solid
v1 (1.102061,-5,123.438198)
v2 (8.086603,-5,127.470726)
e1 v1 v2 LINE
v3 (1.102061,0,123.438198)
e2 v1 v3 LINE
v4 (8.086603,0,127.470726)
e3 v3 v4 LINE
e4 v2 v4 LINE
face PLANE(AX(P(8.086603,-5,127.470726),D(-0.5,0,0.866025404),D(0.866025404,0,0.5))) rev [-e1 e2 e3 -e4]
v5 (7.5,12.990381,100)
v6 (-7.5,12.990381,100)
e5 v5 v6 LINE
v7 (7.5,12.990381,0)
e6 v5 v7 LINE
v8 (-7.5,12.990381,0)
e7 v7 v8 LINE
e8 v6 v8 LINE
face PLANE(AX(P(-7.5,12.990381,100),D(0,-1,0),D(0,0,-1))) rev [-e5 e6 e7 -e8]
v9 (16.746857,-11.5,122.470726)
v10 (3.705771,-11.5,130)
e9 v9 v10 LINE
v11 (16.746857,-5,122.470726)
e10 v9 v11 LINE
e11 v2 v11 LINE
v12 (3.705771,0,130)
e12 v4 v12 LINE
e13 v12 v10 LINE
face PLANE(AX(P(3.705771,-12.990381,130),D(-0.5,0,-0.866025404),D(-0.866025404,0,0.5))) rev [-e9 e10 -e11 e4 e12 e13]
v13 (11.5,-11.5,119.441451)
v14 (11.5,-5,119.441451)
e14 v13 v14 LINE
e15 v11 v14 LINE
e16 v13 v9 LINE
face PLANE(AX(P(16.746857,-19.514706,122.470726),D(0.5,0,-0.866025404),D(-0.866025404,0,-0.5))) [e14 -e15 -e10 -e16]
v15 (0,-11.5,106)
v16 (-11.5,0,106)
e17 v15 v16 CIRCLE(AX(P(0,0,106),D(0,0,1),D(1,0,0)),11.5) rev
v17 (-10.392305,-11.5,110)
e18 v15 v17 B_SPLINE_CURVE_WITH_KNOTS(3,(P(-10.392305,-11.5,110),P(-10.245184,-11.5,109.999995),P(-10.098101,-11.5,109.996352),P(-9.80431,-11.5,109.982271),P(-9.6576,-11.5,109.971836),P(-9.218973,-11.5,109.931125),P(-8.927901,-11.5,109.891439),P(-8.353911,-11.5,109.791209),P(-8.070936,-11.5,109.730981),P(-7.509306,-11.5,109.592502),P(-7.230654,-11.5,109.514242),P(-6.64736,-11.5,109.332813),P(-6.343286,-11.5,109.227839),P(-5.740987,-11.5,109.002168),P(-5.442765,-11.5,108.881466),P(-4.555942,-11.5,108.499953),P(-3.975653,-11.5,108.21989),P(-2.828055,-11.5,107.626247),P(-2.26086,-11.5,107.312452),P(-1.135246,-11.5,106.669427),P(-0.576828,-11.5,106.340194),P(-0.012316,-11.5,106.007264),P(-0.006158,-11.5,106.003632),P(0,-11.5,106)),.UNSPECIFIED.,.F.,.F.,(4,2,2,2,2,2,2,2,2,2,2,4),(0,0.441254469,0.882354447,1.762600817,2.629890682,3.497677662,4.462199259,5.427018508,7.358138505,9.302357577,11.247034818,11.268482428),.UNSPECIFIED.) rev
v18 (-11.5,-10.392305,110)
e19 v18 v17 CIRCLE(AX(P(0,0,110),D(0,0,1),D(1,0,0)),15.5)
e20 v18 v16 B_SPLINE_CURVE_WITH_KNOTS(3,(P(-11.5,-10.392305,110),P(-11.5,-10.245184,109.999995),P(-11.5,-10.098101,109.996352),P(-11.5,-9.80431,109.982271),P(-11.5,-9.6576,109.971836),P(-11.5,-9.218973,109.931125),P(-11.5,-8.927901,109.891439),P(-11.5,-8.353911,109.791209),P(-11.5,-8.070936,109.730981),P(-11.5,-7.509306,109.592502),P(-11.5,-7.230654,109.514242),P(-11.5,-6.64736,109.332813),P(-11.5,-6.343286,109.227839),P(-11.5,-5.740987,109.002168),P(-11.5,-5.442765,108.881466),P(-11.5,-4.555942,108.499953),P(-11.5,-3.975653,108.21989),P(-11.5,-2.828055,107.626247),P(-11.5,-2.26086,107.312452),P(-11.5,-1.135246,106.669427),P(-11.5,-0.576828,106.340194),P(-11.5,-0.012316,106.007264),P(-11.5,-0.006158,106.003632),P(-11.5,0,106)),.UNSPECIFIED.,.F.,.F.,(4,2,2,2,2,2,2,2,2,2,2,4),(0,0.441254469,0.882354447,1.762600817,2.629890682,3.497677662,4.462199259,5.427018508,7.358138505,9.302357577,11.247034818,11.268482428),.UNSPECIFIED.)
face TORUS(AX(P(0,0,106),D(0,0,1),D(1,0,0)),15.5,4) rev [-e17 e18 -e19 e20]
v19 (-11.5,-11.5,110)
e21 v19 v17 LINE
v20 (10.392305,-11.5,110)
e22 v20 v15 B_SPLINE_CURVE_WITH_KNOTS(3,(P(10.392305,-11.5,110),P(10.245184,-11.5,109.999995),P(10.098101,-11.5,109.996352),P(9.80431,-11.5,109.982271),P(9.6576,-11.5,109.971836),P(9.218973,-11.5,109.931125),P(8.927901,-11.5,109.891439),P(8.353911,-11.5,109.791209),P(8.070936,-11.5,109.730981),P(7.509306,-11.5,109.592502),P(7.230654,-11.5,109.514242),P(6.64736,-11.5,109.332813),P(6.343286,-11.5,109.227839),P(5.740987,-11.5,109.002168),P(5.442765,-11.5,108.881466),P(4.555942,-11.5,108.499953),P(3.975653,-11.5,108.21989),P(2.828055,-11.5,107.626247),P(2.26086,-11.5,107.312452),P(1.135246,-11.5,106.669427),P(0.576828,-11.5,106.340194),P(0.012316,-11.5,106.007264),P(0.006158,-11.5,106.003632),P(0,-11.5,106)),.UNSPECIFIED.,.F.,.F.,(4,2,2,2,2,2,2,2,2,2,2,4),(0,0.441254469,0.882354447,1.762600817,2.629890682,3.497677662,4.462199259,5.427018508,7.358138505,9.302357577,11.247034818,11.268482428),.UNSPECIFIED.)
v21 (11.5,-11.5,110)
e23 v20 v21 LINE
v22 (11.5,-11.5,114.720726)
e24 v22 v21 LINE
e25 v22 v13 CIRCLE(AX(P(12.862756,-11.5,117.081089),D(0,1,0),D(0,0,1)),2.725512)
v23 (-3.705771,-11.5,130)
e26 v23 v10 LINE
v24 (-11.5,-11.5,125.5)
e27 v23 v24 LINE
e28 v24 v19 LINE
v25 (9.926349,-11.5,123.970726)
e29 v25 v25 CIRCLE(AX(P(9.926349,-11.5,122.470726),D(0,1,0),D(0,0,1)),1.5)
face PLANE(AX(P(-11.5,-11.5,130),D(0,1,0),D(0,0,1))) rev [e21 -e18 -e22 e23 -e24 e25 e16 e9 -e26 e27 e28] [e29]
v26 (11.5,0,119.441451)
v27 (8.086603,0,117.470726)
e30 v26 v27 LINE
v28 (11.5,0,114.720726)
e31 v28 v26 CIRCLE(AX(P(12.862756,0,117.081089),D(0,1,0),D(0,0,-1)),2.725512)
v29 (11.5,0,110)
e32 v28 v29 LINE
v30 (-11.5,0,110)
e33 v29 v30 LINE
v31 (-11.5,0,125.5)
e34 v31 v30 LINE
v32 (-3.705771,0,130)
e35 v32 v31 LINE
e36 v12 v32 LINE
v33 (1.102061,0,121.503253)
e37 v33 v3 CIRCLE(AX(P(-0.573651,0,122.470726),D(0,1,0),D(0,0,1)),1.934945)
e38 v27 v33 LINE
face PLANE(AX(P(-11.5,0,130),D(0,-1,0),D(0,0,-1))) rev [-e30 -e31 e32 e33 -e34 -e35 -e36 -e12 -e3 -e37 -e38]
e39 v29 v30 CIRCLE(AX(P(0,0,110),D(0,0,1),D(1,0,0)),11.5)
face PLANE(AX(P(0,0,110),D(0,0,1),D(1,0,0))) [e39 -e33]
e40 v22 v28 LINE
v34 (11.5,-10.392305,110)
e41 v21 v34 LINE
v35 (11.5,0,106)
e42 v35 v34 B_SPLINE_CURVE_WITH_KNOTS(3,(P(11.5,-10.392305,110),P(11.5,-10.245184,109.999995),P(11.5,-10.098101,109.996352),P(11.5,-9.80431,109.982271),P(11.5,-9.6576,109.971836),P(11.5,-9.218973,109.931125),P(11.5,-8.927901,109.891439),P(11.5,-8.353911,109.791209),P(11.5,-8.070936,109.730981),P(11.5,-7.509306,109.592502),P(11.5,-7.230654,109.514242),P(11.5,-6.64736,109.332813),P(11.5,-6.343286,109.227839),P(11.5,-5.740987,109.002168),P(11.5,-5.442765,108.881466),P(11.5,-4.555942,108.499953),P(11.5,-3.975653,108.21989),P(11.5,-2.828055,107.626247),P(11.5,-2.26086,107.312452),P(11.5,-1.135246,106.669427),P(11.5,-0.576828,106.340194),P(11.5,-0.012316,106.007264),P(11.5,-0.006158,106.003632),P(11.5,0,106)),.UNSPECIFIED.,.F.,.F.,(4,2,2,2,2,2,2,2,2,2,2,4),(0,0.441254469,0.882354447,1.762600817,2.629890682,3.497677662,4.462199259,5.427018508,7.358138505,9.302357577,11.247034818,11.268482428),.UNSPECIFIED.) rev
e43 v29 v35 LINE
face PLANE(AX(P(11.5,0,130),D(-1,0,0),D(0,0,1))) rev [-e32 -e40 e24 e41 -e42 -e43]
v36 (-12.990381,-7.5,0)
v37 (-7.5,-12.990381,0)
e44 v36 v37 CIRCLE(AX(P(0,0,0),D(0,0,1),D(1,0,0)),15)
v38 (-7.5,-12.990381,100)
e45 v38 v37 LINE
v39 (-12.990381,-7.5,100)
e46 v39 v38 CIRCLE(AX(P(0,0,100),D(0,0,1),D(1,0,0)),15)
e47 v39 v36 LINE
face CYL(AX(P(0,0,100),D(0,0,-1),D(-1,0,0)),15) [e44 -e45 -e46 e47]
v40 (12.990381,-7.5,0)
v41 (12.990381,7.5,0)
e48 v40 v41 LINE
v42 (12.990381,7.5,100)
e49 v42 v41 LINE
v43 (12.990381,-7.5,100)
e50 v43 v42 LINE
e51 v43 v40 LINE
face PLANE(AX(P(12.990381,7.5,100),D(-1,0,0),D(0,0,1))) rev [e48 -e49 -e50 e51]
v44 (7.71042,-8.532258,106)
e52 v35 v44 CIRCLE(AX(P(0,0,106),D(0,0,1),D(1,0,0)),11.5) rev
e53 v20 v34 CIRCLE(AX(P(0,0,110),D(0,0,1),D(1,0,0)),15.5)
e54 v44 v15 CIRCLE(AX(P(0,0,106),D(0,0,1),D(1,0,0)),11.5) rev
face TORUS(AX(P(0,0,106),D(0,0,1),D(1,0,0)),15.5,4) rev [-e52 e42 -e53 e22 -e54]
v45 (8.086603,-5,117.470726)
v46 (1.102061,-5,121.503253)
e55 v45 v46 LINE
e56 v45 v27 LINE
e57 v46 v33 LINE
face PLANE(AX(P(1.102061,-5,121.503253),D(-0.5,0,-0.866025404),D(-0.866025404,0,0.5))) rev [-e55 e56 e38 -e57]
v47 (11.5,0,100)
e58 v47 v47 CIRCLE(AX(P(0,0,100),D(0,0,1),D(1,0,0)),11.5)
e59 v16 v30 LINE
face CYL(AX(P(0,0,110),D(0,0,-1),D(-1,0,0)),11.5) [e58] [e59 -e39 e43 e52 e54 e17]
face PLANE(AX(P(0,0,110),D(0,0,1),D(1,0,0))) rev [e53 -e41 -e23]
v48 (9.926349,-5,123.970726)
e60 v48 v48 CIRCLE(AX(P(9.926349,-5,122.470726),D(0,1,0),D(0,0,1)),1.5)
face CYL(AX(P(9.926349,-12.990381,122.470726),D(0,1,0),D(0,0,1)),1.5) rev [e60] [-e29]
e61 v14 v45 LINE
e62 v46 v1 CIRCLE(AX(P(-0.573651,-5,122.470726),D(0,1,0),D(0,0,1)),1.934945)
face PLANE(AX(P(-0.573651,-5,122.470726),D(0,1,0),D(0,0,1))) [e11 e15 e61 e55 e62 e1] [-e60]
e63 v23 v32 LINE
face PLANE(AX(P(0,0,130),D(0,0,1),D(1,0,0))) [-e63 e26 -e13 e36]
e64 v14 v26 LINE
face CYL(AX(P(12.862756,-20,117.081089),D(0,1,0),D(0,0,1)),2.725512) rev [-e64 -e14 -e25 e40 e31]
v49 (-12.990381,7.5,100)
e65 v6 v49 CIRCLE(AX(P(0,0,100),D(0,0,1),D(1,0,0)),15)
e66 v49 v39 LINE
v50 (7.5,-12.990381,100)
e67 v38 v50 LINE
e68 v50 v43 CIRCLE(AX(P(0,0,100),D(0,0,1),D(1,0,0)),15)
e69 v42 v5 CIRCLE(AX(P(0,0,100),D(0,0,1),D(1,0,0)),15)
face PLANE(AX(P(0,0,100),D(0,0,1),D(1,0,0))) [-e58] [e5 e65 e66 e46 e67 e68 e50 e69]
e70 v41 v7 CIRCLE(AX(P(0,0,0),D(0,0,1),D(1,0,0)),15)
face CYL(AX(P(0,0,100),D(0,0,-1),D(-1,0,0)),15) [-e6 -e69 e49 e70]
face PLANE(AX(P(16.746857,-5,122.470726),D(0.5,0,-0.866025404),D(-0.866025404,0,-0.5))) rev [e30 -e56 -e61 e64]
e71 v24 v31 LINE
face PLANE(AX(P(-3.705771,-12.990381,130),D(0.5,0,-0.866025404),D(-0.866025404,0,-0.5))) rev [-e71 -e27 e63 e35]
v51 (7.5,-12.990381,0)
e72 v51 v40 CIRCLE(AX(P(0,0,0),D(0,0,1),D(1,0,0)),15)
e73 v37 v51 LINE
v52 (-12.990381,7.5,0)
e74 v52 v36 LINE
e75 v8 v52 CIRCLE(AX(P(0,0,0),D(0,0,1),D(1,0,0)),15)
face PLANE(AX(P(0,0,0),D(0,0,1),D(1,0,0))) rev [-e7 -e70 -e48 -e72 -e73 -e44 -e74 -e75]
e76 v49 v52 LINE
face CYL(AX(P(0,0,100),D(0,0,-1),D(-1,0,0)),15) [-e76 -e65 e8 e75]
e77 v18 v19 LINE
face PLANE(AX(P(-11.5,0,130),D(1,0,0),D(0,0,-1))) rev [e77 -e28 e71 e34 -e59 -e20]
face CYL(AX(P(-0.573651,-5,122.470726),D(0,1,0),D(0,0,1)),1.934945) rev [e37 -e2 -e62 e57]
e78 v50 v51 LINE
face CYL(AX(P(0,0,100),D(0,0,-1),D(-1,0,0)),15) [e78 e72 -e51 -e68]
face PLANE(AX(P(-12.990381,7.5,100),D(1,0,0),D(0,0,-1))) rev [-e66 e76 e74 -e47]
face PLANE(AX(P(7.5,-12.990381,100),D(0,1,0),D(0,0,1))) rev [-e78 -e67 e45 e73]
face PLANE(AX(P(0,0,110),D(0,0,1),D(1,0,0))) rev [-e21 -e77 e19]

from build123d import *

# Parameters (mm, degrees)
EXTRUDE_1_DEPTH     = 100
SKETCH_2_R          = 11.5
EXTRUDE_2_DEPTH     = 10
SKETCH_3_W          = 23
SKETCH_3_H          = 11.5
EXTRUDE_3_DEPTH     = 20
FILLET_3_R          = 4
FILLET_4_R          = 4
CUT_EXTRUDE_1_DEPTH = 132.291660154
EXTRUDE_4_DEPTH     = 11.5
CUT_EXTRUDE_2_DEPTH = 20
CUT_EXTRUDE_3_DEPTH = 5
SKETCH_8_R          = 1.5
CUT_EXTRUDE_4_DEPTH = 133.303102986


with BuildPart() as part:
    # 草图1 → 凸台-拉伸1 (new body)
    with BuildSketch(Plane.XY):
        with BuildLine():
            Line((-7.5, 12.990381057), (7.5, 12.990381057))
            ThreePointArc((7.5, 12.990381057), (10.606601718, 10.606601718), (12.990381057, 7.5))
            Line((12.990381057, 7.5), (12.990381057, -7.5))
            ThreePointArc((12.990381057, -7.5), (10.606601718, -10.606601718), (7.5, -12.990381057))
            Line((7.5, -12.990381057), (-7.5, -12.990381057))
            ThreePointArc((-7.5, -12.990381057), (-10.606601718, -10.606601718), (-12.990381057, -7.5))
            Line((-12.990381057, -7.5), (-12.990381057, 7.5))
            ThreePointArc((-12.990381057, 7.5), (-10.606601718, 10.606601718), (-7.5, 12.990381057))
        make_face()
    extrude(amount=EXTRUDE_1_DEPTH)

    # 草图2 → 凸台-拉伸2 (add)
    with BuildSketch(Plane.XY.offset(100)):
        Circle(SKETCH_2_R)
    extrude(amount=EXTRUDE_2_DEPTH)

    # 草图3 → 凸台-拉伸3 (add)
    with BuildSketch(Plane.XY.offset(110)):
        with Locations((0, -5.75)):
            Rectangle(SKETCH_3_W, SKETCH_3_H)
    extrude(amount=EXTRUDE_3_DEPTH)

    # 圆角3
    # the kernel refuses this fillet: 4 mm, written as the material it adds along each edge
    with BuildSketch(Plane(origin=(0, 0, 110), x_dir=(0, -1, 0), z_dir=(-1, 0, 0))) as fillet_3_piece_1_section:
        with BuildLine():
            CenterArc((11.5 + FILLET_3_R, -FILLET_3_R), FILLET_3_R, 90, 90)
            Line((11.5 + FILLET_3_R, 0), (11.5, 0))
            Line((11.5, 0), (11.5, -FILLET_3_R))
        make_face()
    fillet_3_piece_1 = revolve(axis=Axis((0, 0, 110), (0, 0, 1)), revolution_arc=90, mode=Mode.PRIVATE)
    fillet_3_piece_1 = split(fillet_3_piece_1, bisect_by=Plane(origin=(8.245599316, -11.5, 108.963397676), z_dir=(0, 1, 0)), keep=Keep.TOP, mode=Mode.PRIVATE)
    fillet_3_piece_1 = split(fillet_3_piece_1, bisect_by=Plane(origin=(11.5, -8.245600634, 108.963397676), z_dir=(-1, 0, 0)), keep=Keep.TOP, mode=Mode.PRIVATE)
    add(fillet_3_piece_1)

    # 圆角4
    # the kernel refuses this fillet: 4 mm, written as the material it adds along each edge
    with BuildSketch(Plane(origin=(0, 0, 110), x_dir=(-1, 0, 0), z_dir=(0, 1, 0))) as fillet_4_piece_1_section:
        with BuildLine():
            CenterArc((11.5 + FILLET_4_R, -FILLET_4_R), FILLET_4_R, 90, 90)
            Line((11.5 + FILLET_4_R, 0), (11.5, 0))
            Line((11.5, 0), (11.5, -FILLET_4_R))
        make_face()
    fillet_4_piece_1 = revolve(axis=Axis((0, 0, 110), (0, 0, 1)), revolution_arc=139.842431039, mode=Mode.PRIVATE)
    fillet_4_piece_1 = split(fillet_4_piece_1, bisect_by=Plane(origin=(-8.245600113, -11.5, 108.963397741), z_dir=(0, 1, 0)), keep=Keep.TOP, mode=Mode.PRIVATE)
    fillet_4_piece_1 = split(fillet_4_piece_1, bisect_by=Plane(origin=(11.5, -8.245601202, 108.963397741), z_dir=(-1, 0, 0)), keep=Keep.TOP, mode=Mode.PRIVATE)
    fillet_4_piece_1 = split(fillet_4_piece_1, bisect_by=Plane(origin=(-11.5, -8.245601202, 108.963397741), z_dir=(1, 0, 0)), keep=Keep.TOP, mode=Mode.PRIVATE)
    add(fillet_4_piece_1)

    # 草图4 → 切除-拉伸1 (cut, through all)
    with BuildSketch(Plane(origin=(0, 0, 0), x_dir=(1, 0, 0), z_dir=(0, 1, 0))):
        Polygon((3.705771366, -130), (11.5, -125.5), (11.5, -130), align=None)
        Polygon((-11.5, -130), (-3.705771366, -130), (-11.5, -125.5), align=None)
    extrude(amount=-CUT_EXTRUDE_1_DEPTH, mode=Mode.SUBTRACT)

    # 草图5 → 凸台-拉伸4 (add)
    with BuildSketch(Plane(origin=(0, 0, 0), x_dir=(1, 0, 0), z_dir=(0, 1, 0))):
        Polygon((11.5, -125.5), (16.746857011, -122.470725692), (11.5, -119.441451384), align=None)
    extrude(amount=-EXTRUDE_4_DEPTH)

    # 草图6 → 切除-拉伸2 (cut)
    with BuildSketch(Plane(origin=(0, 0, 0), x_dir=(1, 0, 0), z_dir=(0, 1, 0))):
        with BuildLine():
            Line((11.5, -114.720725692), (11.5, -119.441451384))
            ThreePointArc((11.5, -119.441451384), (10.137243875, -117.081088538), (11.5, -114.720725692))
        make_face()
    extrude(amount=-CUT_EXTRUDE_2_DEPTH, mode=Mode.SUBTRACT)

    # 草图7 → 切除-拉伸3 (cut)
    with BuildSketch(Plane(origin=(0, 0, 0), x_dir=(1, 0, 0), z_dir=(0, 1, 0))):
        with BuildLine():
            Line((16.746857011, -122.470725692), (8.086602973, -127.470725692))
            Line((8.086602973, -127.470725692), (1.102060707, -123.438198334))
            ThreePointArc((1.102060707, -123.438198334), (-2.508596349, -122.470725692), (1.102060707, -121.50325305))
            Line((1.102060707, -121.50325305), (8.086602973, -117.470725692))
            Line((8.086602973, -117.470725692), (16.746857011, -122.470725692))
        make_face()
    extrude(amount=-CUT_EXTRUDE_3_DEPTH, mode=Mode.SUBTRACT)

    # 草图8 → 切除-拉伸4 (cut, through all)
    with BuildSketch(Plane(origin=(0, -5, 0), x_dir=(1, 0, 0), z_dir=(0, 1, 0))):
        with Locations(Location((9.926348936, -122.470725692, 0), (0, 0, 270))):
            Circle(SKETCH_8_R)
    extrude(amount=-CUT_EXTRUDE_4_DEPTH, mode=Mode.SUBTRACT)


solid = part.part
